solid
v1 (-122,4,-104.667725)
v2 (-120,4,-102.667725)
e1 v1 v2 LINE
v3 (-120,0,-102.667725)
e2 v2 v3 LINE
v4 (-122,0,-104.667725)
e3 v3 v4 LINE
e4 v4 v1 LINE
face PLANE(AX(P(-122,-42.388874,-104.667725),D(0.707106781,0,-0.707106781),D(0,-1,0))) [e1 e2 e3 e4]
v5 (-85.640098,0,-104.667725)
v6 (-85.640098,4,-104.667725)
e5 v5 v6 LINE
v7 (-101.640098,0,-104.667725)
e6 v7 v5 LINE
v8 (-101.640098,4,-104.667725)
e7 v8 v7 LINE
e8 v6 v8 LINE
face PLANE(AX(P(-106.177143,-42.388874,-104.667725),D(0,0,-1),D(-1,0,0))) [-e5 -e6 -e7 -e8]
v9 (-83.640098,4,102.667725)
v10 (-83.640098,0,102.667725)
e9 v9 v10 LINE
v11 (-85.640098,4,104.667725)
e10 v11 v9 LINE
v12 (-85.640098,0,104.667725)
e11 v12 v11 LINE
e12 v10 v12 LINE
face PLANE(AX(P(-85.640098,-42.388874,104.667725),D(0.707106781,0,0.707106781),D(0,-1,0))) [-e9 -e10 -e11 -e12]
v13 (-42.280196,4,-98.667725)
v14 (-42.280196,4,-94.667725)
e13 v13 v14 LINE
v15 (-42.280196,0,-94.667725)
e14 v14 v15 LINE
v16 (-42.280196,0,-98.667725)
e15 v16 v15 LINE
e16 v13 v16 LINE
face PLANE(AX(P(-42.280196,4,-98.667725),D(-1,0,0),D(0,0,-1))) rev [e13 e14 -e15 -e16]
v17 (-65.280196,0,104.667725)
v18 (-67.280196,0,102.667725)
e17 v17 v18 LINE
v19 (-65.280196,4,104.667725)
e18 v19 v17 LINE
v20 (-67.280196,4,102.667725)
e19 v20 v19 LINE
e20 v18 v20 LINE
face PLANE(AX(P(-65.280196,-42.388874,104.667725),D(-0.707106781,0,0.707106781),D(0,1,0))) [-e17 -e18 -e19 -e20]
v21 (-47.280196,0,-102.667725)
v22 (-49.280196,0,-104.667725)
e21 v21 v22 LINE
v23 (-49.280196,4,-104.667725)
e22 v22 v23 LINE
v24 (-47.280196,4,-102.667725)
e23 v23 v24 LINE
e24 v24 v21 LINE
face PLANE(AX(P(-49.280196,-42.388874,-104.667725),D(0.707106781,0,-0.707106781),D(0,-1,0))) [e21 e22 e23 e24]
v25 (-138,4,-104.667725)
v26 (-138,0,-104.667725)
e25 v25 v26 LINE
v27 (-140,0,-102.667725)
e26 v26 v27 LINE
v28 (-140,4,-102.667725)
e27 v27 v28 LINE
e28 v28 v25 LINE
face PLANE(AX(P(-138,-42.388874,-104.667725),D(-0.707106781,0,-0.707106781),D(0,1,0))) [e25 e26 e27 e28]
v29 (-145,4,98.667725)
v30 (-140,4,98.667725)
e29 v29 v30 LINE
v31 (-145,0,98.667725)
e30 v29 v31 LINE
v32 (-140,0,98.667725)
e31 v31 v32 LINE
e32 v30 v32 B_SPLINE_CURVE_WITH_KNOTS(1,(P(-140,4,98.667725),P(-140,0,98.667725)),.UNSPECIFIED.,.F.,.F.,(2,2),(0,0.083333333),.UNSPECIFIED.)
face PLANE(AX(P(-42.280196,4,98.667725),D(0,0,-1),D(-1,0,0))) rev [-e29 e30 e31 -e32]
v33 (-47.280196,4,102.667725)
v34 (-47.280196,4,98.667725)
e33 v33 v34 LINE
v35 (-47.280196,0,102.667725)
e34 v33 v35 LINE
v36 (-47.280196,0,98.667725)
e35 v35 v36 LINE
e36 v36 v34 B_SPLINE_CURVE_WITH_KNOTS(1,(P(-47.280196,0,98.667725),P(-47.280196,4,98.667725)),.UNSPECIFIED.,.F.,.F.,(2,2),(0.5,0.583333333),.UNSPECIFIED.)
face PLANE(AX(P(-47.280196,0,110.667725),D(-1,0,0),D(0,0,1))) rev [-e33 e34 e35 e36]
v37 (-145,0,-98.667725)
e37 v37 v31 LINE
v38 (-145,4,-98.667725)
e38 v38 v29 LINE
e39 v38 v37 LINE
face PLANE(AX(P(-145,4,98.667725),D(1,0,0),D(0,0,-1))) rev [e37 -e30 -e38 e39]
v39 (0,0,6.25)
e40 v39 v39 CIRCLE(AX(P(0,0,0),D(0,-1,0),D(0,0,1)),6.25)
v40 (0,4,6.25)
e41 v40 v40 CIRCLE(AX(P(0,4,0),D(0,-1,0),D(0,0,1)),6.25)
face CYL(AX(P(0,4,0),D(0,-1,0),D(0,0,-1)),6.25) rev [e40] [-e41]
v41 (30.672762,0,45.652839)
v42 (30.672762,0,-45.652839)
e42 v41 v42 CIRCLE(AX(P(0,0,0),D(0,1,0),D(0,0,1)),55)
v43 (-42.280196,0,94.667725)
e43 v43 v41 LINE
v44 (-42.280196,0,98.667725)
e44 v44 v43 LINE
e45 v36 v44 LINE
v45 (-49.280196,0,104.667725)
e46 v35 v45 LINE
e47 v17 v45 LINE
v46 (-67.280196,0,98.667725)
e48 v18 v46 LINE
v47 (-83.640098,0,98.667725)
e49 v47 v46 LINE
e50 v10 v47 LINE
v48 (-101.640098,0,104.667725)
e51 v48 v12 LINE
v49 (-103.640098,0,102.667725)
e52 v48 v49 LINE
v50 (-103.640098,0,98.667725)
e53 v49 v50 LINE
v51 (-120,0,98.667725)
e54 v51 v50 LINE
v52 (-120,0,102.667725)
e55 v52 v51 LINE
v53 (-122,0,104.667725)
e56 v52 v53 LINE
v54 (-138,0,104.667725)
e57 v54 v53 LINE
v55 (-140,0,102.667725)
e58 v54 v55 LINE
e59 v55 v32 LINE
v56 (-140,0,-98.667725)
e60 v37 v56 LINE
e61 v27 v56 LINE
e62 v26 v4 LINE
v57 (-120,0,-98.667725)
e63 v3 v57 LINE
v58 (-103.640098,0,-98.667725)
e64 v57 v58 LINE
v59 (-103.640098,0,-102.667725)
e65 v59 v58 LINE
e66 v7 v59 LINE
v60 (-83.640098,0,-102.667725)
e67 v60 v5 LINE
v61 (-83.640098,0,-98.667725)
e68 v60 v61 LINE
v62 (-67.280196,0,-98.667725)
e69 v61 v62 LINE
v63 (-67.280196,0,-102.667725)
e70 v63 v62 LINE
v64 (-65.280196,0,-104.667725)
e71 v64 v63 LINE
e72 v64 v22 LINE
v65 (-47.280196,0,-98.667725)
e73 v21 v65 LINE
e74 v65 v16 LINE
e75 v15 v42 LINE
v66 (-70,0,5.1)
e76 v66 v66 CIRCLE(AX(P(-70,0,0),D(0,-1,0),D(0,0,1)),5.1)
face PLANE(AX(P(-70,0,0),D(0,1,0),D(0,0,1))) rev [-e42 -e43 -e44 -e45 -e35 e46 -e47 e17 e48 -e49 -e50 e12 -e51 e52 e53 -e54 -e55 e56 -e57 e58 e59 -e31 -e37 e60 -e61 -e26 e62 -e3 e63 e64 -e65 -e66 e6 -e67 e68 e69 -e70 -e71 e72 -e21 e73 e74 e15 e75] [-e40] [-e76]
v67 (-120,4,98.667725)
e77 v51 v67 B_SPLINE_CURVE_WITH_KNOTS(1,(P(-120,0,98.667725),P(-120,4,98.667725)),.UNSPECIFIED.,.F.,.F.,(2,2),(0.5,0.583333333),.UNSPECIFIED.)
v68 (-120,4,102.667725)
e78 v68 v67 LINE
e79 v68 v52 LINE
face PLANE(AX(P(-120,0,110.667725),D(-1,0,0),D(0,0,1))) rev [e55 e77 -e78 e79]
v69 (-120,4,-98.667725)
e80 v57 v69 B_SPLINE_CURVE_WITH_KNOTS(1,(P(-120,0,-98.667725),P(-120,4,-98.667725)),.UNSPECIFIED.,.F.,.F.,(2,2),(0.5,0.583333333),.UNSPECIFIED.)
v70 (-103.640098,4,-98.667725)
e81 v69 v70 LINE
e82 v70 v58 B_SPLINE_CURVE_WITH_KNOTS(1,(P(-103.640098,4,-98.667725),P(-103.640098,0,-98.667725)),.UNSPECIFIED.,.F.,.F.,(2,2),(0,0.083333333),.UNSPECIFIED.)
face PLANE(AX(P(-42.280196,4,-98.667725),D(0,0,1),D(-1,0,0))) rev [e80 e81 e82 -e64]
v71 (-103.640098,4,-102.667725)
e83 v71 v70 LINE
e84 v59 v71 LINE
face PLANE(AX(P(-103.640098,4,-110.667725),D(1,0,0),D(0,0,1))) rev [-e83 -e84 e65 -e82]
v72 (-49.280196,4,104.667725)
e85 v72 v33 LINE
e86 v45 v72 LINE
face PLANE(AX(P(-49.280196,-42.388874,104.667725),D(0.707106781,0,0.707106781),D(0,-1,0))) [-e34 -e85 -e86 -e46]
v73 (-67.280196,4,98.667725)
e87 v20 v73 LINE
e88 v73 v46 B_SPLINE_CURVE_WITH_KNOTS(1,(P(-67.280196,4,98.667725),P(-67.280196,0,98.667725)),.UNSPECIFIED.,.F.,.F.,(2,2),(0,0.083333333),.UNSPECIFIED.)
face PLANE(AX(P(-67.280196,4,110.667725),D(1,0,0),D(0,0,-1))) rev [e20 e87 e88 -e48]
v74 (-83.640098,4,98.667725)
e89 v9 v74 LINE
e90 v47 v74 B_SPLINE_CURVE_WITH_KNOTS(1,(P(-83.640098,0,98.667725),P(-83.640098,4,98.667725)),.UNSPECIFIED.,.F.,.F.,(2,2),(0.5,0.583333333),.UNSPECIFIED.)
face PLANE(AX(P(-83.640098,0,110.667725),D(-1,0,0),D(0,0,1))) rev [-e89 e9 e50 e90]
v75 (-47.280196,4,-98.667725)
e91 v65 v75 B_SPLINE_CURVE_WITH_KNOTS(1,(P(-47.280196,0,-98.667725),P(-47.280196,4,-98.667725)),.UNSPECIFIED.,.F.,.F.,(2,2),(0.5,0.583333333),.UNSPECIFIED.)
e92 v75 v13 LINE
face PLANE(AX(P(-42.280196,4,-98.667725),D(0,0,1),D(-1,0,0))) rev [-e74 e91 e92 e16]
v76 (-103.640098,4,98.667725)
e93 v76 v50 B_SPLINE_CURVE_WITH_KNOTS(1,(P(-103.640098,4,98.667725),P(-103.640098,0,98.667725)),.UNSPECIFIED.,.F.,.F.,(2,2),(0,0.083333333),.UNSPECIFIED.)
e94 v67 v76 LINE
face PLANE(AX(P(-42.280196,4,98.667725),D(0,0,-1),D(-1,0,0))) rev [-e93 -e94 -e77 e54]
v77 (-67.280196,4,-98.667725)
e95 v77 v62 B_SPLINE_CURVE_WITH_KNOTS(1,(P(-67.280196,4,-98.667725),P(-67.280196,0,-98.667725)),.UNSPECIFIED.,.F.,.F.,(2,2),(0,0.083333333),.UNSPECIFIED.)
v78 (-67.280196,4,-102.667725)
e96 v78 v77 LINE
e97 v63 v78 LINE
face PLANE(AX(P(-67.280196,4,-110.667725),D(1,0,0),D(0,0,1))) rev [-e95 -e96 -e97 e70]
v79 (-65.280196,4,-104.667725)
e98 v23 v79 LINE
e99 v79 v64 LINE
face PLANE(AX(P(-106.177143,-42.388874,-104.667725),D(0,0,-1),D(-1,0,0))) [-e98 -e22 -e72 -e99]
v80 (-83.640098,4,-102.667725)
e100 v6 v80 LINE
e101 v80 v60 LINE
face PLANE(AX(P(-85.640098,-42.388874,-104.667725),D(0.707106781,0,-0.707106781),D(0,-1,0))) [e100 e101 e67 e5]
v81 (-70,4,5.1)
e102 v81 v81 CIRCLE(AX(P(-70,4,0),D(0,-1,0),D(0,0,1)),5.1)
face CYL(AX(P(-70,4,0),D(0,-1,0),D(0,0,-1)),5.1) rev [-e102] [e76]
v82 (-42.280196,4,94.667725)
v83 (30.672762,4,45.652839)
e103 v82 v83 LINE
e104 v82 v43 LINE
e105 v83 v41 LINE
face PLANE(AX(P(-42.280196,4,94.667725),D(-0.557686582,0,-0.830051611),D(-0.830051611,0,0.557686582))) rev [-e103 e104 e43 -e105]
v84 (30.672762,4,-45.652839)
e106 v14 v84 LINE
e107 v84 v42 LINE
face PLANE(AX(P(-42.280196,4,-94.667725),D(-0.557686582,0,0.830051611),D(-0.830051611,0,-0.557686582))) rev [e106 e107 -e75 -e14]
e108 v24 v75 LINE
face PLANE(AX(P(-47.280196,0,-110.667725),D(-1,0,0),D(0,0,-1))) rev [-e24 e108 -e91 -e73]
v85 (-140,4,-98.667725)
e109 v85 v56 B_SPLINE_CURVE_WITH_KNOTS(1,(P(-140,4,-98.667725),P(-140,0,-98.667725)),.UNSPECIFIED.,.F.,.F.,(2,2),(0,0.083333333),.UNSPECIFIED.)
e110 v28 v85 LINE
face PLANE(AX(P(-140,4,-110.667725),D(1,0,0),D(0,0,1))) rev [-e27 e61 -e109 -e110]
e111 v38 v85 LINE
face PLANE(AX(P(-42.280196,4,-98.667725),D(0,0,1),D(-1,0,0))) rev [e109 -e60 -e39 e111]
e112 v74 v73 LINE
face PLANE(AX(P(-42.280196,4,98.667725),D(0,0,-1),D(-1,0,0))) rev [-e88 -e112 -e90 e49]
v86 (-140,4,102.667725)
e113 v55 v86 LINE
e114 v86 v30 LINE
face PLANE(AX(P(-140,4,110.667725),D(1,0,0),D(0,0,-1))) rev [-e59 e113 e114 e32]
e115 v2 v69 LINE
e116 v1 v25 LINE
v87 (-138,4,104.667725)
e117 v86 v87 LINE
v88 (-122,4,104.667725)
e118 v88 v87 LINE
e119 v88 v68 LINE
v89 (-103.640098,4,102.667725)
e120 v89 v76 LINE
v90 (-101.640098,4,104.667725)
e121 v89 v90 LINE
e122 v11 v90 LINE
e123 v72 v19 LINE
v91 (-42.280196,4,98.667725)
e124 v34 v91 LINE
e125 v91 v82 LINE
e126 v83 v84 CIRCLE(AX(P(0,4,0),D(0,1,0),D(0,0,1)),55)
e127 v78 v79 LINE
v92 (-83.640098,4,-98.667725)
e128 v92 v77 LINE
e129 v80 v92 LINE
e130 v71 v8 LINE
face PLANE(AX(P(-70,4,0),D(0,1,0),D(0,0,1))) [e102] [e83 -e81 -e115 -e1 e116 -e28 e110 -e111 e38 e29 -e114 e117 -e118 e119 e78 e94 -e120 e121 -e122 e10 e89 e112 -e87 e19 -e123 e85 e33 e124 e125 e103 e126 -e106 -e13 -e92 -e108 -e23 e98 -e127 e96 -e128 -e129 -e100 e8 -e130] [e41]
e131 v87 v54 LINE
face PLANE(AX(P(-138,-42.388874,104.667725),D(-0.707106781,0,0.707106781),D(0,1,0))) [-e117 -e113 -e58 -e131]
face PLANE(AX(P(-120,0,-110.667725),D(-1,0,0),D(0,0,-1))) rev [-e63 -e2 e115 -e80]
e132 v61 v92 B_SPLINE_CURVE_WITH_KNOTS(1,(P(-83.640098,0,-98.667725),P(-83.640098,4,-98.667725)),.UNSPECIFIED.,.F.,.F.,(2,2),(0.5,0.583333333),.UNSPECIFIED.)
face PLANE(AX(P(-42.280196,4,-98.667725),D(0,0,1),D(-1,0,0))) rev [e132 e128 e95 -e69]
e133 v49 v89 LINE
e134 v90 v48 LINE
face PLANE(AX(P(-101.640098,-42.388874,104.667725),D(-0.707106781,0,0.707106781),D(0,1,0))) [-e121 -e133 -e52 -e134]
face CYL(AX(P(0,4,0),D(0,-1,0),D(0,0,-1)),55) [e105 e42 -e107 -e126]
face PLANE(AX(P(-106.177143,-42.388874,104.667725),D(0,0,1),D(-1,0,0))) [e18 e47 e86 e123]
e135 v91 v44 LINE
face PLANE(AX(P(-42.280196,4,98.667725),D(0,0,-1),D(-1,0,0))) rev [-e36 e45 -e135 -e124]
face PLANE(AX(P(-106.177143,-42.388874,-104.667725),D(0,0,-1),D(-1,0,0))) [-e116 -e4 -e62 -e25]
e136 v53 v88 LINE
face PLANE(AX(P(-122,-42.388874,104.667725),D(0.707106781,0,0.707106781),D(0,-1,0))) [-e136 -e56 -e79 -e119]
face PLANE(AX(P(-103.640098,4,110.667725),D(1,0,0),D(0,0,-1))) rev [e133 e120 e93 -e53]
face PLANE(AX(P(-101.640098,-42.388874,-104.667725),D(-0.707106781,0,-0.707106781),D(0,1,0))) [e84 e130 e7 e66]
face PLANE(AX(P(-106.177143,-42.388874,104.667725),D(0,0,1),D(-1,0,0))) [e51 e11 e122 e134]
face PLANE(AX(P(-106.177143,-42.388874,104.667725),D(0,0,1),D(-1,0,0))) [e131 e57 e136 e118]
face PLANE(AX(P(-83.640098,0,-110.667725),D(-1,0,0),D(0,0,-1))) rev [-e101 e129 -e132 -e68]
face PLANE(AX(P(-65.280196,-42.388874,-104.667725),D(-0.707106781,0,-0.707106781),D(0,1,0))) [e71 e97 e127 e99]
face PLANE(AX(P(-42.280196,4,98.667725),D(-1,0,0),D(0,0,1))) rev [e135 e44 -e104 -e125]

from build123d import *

# Parameters (mm, degrees)
SM_BASE_FLANGE_1_DEPTH = 4
OTHER_1_DEPTH          = 4


# Read off the part's stored shape, not the designer's step: Выступы и прорези-Выступ1
# Sheet-metal steps are written as plain solids
with BuildPart() as part:
    # Sketch 1 → Базовая кромка1 (new body)
    with BuildSketch(Plane(origin=(0, 0, 0), x_dir=(1, 0, 0), z_dir=(0, 1, 0))):
        with BuildLine():
            Line((-145, -98.667725183), (-145, 0))
            Line((-145, 0), (-75.1, 0))
            ThreePointArc((-75.1, 0), (-70, -5.1), (-64.9, 0))
            Line((-64.9, 0), (-6.25, 0))
            ThreePointArc((-6.25, 0), (0, -6.25), (6.25, 0))
            Line((6.25, 0), (55, 0))
            ThreePointArc((55, 0), (48.538654235, -25.865015853), (30.672761998, -45.652838591))
            Line((30.672761998, -45.652838591), (-42.280195622, -94.667725183))
            Line((-42.280195622, -94.667725183), (-42.280195622, -98.667725183))
            Line((-42.280195622, -98.667725183), (-145, -98.667725183))
        make_face()
    extrude(amount=SM_BASE_FLANGE_1_DEPTH)

    # Other 1 outline → Other 1 (add)
    with BuildSketch(Plane(origin=(0, 0, 0), x_dir=(1, 0, 0), z_dir=(0, 1, 0))):
        Polygon((-47.280195622, -98.667725183), (-67.280195622, -98.667725183), (-67.280195622, -102.667725183), (-65.280195622, -104.667725183), (-49.280195622, -104.667725183), (-47.280195622, -102.667725183), align=None)
        Polygon((-83.640097811, -98.667725183), (-103.640097811, -98.667725183), (-103.640097811, -102.667725183), (-101.640097811, -104.667725183), (-85.640097811, -104.667725183), (-83.640097811, -102.667725183), align=None)
        Polygon((-140, -98.667725183), (-140, -102.667725183), (-138, -104.667725183), (-122, -104.667725183), (-120, -102.667725183), (-120, -98.667725183), align=None)
    extrude(amount=OTHER_1_DEPTH)

    # Зеркальное отражение1: part across plane


with BuildPart() as part_1:
    add(part.part)
    add(part.part.mirror(Plane(origin=(-145, 4, 0), x_dir=(1, 0, 0), z_dir=(0, 0, 1))))


solid = part_1.part
